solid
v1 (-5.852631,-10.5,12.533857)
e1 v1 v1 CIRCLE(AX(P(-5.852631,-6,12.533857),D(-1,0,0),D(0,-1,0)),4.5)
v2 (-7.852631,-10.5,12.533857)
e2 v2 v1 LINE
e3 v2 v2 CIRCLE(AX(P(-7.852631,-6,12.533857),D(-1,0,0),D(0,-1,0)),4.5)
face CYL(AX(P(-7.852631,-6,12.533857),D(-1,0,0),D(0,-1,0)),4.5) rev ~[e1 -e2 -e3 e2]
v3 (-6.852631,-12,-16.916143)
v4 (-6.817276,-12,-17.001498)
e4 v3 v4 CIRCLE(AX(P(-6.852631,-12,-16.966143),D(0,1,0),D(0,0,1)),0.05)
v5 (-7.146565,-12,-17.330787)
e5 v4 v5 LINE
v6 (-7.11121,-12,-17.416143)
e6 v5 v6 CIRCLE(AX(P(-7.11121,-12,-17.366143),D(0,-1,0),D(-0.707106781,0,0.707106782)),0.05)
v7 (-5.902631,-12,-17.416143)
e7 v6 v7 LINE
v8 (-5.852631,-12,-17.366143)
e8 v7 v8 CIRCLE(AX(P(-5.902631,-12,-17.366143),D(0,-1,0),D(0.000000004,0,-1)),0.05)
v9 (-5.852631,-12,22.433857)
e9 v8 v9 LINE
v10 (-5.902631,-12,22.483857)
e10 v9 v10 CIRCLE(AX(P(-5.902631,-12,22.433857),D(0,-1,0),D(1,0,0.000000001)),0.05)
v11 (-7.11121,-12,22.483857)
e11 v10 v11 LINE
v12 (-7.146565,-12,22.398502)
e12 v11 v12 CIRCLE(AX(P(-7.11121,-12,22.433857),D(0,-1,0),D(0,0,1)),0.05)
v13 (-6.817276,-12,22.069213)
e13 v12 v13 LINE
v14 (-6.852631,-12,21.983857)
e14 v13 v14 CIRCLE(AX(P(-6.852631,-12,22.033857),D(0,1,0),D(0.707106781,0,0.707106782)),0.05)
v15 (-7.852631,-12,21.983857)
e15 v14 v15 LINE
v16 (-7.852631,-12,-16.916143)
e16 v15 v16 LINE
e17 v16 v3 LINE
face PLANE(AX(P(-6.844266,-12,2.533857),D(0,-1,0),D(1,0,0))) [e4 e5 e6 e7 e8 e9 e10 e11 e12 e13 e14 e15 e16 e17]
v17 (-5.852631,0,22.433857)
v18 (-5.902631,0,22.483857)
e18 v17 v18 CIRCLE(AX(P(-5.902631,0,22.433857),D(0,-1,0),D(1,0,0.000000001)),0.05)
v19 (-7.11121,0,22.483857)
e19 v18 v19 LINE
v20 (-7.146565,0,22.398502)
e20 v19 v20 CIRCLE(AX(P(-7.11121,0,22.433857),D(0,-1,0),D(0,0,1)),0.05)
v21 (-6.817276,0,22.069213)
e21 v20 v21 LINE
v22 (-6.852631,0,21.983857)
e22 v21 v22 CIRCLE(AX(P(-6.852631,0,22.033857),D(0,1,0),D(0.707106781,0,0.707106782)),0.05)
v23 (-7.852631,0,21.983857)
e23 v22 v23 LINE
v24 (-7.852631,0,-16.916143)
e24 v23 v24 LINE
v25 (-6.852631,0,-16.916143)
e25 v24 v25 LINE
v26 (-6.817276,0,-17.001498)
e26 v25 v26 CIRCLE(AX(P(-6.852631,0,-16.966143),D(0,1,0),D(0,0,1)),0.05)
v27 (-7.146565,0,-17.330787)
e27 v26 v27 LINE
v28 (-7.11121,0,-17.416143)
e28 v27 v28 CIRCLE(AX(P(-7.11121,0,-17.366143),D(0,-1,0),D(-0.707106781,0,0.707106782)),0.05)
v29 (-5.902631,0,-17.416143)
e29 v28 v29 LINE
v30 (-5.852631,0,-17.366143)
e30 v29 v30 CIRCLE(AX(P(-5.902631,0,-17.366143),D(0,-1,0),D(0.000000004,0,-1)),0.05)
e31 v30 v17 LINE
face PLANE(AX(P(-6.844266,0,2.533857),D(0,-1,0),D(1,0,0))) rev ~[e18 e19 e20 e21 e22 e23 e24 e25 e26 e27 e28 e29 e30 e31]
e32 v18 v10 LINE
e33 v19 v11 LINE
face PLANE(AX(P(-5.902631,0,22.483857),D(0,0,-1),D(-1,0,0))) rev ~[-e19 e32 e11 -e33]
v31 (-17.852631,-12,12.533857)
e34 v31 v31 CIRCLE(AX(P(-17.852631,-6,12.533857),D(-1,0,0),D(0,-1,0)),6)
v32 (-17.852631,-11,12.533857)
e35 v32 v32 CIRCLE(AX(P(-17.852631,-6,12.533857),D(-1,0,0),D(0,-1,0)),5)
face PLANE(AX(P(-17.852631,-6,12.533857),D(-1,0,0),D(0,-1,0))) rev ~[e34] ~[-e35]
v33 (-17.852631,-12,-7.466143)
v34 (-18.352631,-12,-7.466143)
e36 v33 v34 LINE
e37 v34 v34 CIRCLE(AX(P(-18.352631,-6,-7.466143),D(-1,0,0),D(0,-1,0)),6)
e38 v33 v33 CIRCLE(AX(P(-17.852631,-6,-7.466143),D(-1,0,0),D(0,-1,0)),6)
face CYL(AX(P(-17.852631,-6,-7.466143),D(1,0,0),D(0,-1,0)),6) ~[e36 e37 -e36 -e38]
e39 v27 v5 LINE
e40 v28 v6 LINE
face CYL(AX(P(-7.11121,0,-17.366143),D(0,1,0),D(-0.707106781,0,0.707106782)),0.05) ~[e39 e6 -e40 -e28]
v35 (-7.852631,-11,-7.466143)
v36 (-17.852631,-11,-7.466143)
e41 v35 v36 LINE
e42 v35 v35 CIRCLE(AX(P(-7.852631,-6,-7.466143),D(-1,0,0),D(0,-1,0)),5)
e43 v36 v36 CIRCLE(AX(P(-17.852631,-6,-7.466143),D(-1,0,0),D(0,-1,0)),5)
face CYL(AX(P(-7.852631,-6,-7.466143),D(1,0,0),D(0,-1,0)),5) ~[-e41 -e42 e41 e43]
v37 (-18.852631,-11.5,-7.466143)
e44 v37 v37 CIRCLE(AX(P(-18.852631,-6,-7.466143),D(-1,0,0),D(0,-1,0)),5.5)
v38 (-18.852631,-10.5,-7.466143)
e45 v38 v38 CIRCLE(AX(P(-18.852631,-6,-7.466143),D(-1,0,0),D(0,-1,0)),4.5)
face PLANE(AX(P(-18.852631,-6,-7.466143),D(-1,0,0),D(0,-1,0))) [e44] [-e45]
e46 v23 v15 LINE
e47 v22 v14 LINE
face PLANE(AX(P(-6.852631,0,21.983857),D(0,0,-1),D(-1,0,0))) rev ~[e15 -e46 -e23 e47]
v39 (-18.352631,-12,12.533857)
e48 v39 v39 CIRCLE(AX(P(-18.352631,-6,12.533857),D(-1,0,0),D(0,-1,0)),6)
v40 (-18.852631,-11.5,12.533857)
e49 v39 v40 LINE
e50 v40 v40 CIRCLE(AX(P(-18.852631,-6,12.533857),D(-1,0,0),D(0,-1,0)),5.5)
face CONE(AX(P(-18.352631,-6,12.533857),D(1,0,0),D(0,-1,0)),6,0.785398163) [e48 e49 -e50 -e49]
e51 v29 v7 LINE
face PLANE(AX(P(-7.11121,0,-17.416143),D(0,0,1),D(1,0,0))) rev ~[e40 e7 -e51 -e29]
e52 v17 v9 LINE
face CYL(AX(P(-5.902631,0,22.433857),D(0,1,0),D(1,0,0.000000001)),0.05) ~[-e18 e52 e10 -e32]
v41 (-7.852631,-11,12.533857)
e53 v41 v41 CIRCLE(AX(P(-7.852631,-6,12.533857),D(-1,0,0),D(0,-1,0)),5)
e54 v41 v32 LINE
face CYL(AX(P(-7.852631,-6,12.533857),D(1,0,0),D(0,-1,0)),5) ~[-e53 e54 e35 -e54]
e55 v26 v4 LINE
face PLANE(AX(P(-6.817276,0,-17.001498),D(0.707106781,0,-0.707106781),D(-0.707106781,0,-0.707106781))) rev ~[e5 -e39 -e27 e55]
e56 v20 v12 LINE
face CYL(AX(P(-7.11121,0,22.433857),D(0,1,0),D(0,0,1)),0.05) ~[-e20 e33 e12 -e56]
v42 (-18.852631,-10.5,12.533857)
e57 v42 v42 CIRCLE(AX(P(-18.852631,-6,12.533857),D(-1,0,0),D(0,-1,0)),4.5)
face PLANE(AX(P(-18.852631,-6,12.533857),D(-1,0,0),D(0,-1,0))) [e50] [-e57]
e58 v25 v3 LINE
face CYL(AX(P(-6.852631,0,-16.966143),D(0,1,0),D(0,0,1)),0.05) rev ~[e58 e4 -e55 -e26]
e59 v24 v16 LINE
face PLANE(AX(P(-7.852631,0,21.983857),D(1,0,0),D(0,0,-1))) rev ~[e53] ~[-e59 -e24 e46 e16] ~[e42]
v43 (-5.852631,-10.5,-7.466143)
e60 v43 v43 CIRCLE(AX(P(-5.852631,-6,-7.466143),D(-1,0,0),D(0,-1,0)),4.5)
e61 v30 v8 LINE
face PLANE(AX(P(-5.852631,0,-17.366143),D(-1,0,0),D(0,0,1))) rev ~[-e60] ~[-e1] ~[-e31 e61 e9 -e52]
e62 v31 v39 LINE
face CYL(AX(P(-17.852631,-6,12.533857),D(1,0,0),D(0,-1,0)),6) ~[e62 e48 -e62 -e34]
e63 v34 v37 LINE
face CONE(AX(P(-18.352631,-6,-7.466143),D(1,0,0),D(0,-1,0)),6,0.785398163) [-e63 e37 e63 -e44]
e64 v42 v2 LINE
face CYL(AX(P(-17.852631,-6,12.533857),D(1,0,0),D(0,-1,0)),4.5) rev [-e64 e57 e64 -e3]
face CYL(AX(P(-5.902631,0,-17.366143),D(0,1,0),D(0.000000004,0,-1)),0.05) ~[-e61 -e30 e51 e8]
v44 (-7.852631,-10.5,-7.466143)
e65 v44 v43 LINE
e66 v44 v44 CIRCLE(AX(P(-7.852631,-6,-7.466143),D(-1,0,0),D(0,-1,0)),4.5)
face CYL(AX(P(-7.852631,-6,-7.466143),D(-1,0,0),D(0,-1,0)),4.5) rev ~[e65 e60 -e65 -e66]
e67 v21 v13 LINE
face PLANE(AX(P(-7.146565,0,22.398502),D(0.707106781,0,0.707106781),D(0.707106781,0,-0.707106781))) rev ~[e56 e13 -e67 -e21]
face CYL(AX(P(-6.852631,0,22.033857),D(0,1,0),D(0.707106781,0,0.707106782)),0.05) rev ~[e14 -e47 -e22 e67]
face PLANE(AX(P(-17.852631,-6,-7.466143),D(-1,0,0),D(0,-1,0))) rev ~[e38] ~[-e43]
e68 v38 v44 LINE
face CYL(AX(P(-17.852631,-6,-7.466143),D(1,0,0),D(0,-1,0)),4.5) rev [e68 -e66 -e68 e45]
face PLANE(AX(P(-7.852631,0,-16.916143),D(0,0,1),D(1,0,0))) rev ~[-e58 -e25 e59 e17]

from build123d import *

# Parameters (mm, degrees)
F1_DEPTH = 12
F2_R     = 5
F2_R_2   = 4.5
F3_DEPTH = 10
F4_R     = 6
F4_R_2   = 4.5
F5_DEPTH = 1
F6_DEPTH = 25
F7_SIZE  = 0.5


with BuildPart() as f1:
    # F0 (on Front) → F1 (new body)
    with BuildSketch(Plane.XZ):
        with BuildLine():
            Line((-5.8526312746, -17.3661426386), (-5.8526312746, 22.4338573614))
            ThreePointArc((-5.8526312746, 22.4338573614), (-5.8672759356, 22.4692127005), (-5.9026312746, 22.4838573614))
            Line((-5.9026312746, 22.4838573614), (-7.1112099184, 22.4838573614))
            ThreePointArc((-7.1112099184, 22.4838573614), (-7.157403895, 22.452991533), (-7.1465652574, 22.3985020224))
            Line((-7.1465652574, 22.3985020224), (-6.8172759356, 22.0692127005))
            ThreePointArc((-6.8172759356, 22.0692127005), (-6.806437298, 22.0147231898), (-6.8526312746, 21.9838573614))
            Line((-6.8526312746, 21.9838573614), (-7.8526312746, 21.9838573614))
            Line((-7.8526312746, 21.9838573614), (-7.8526312746, -16.9161426386))
            Line((-7.8526312746, -16.9161426386), (-6.8526312746, -16.9161426386))
            ThreePointArc((-6.8526312746, -16.9161426386), (-6.806437298, -16.947008467), (-6.8172759356, -17.0014979776))
            Line((-6.8172759356, -17.0014979776), (-7.1465652574, -17.3307872995))
            ThreePointArc((-7.1465652574, -17.3307872995), (-7.157403895, -17.3852768102), (-7.1112099184, -17.4161426386))
            Line((-7.1112099184, -17.4161426386), (-5.9026312746, -17.4161426386))
            ThreePointArc((-5.9026312746, -17.4161426386), (-5.8672759356, -17.4014979776), (-5.8526312746, -17.3661426386))
        make_face()
    extrude(amount=F1_DEPTH)

    # F2 (on face) → F3 (join)
    with BuildSketch(Plane(origin=(-7.8526312746, 0, 0), x_dir=(0, -1, 0), z_dir=(-1, 0, 0))):
        with Locations((6, 12.5338573614)):
            Circle(F2_R)
        with Locations((6, 12.5338573614)):
            Circle(F2_R_2, mode=Mode.SUBTRACT)
        with Locations((6, -7.4661426386)):
            Circle(F2_R)
        with Locations((6, -7.4661426386)):
            Circle(F2_R_2, mode=Mode.SUBTRACT)
    extrude(amount=F3_DEPTH)

    # F4 (on face) → F5 (join)
    with BuildSketch(Plane(origin=(-17.8526312746, 0, 0), x_dir=(0, -1, 0), z_dir=(-1, 0, 0))):
        with Locations((6, 12.5338573614)):
            Circle(F4_R)
        with Locations((6, 12.5338573614)):
            Circle(F4_R_2, mode=Mode.SUBTRACT)
        with Locations((6, -7.4661426386)):
            Circle(F4_R)
        with Locations((6, -7.4661426386)):
            Circle(F4_R_2, mode=Mode.SUBTRACT)
    extrude(amount=F5_DEPTH)

    # F6 (cut): faces of the model
    f6_faces = [f1.faces().sort_by_distance(p)[0] for p in [
        (-7.8526312746, -6, 12.5338573614),
        (-7.8526312746, -6, -7.4661426386),
    ]]
    extrude(f6_faces, amount=-F6_DEPTH, mode=Mode.SUBTRACT)

    # F7
    f7_edges = [f1.edges().sort_by_distance(p)[0] for p in [
        (-18.852631, 0, 12.533857),
        (-18.852631, 0, -7.466143),
    ]]
    chamfer(f7_edges, length=F7_SIZE)


solid = f1.part
